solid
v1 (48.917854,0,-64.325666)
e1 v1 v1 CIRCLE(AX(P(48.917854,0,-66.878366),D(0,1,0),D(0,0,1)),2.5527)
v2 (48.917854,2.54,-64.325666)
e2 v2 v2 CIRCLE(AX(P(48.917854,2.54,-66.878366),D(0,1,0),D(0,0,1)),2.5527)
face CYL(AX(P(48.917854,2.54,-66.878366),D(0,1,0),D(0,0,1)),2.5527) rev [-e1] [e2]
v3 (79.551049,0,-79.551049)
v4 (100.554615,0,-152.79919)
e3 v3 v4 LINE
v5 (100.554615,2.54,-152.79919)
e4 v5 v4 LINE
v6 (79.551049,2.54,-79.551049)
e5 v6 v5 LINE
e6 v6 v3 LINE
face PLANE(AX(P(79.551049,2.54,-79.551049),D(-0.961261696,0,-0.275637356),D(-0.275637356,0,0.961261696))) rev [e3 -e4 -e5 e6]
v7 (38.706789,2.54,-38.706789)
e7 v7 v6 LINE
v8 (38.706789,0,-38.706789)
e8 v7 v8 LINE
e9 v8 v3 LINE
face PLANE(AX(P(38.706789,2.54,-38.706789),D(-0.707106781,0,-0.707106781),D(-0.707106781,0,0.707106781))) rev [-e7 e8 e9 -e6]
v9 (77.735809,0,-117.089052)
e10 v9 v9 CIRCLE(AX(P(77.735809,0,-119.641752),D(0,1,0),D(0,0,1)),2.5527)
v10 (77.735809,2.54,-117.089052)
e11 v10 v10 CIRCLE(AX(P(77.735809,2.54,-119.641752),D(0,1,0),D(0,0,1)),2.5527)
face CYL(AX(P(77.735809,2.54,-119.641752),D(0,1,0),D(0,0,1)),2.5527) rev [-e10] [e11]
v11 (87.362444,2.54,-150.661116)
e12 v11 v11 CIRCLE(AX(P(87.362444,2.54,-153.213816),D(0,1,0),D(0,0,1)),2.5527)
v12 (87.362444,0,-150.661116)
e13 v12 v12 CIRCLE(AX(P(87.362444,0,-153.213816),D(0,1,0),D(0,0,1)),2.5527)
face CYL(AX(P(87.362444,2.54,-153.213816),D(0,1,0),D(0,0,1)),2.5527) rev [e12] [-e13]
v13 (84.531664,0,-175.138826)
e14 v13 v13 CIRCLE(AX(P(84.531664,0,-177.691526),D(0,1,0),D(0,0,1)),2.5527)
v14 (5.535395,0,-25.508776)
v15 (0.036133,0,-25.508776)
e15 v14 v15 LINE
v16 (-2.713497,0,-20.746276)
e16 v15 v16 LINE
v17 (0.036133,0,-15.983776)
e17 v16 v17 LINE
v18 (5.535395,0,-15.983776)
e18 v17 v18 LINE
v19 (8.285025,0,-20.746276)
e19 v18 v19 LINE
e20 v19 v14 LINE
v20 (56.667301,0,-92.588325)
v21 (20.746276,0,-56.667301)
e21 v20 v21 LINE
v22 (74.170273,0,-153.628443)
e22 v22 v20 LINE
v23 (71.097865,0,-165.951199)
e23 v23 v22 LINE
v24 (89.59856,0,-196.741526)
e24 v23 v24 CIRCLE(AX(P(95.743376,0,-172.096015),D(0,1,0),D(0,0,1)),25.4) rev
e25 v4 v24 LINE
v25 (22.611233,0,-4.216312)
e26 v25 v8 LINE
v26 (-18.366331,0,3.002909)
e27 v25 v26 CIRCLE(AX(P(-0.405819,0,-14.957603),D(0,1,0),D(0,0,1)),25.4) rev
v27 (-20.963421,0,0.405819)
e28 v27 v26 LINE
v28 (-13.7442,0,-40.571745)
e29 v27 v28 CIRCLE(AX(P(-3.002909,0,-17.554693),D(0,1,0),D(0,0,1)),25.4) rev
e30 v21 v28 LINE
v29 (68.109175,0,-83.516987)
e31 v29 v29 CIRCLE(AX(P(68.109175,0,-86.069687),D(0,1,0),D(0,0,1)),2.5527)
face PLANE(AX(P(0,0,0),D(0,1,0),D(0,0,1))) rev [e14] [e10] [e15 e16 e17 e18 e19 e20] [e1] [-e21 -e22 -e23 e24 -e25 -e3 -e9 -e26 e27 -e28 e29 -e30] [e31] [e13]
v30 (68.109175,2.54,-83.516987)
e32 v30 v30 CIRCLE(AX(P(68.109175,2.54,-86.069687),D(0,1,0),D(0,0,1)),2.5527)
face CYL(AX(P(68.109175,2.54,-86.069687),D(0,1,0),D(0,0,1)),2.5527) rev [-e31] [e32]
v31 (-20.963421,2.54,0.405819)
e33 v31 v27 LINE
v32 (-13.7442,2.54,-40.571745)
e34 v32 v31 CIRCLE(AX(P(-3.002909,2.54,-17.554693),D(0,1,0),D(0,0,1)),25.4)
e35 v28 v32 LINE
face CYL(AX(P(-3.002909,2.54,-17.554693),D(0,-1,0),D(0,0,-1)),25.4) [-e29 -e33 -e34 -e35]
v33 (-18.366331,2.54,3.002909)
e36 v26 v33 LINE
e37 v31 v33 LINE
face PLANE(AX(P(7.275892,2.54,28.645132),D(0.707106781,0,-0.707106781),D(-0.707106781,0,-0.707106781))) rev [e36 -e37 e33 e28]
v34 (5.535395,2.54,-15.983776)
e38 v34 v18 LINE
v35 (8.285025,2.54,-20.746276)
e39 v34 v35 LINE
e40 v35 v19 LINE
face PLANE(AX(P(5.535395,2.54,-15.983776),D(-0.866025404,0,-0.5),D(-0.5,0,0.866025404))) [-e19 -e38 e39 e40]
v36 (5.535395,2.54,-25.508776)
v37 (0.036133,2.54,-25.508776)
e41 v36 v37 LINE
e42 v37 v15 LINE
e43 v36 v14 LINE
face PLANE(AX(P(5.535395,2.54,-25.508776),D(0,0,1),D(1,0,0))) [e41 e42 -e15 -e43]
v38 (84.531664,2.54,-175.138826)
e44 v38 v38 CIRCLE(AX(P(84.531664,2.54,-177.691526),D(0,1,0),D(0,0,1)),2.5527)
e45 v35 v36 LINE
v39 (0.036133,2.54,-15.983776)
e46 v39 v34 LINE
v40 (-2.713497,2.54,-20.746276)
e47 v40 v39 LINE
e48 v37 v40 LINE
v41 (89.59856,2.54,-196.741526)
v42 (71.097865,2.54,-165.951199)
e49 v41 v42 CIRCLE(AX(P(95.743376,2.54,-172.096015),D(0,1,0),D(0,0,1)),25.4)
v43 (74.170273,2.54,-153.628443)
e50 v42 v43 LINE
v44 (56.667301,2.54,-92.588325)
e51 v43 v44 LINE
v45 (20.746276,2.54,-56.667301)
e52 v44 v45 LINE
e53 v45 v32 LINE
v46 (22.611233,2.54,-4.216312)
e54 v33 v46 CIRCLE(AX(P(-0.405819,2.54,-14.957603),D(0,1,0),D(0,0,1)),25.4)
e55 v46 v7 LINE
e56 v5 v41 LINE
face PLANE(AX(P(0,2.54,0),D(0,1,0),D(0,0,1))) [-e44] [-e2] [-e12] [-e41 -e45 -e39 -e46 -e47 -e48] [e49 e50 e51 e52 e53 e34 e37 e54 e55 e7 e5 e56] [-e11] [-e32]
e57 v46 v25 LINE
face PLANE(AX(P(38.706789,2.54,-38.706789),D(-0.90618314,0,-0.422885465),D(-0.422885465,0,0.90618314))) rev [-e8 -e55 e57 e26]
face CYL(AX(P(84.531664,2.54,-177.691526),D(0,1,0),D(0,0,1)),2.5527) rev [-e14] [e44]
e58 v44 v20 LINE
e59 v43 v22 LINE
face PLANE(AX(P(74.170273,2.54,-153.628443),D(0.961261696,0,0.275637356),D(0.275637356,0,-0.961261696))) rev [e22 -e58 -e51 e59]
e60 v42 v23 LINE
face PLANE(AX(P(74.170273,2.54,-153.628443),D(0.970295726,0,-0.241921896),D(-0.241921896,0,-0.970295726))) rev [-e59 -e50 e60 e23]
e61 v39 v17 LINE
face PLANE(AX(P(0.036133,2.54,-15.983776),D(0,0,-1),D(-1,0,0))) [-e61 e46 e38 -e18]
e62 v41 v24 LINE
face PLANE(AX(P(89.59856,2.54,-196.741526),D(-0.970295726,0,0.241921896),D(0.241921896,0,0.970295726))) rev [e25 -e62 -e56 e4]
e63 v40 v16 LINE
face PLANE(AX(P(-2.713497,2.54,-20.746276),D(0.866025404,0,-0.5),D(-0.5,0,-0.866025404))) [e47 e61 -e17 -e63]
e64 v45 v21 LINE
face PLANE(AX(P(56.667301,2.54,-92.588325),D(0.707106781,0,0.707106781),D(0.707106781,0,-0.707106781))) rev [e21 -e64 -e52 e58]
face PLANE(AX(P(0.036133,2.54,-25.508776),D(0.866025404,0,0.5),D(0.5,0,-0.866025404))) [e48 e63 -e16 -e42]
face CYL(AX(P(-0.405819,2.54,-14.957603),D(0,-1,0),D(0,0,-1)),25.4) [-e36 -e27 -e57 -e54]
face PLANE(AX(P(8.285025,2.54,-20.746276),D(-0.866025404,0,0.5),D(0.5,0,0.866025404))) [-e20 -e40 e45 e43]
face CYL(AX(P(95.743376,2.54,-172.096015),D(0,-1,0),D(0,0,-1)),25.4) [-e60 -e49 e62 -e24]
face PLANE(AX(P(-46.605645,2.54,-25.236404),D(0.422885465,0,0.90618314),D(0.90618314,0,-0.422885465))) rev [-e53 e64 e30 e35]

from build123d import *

# Parameters (mm, degrees)
BOSS_EXTRUDE1_DEPTH        = 2.54
FILLET3_R                  = 25.4
F_10_CLEARANCE_HOLE1_D     = 5.1054
F_10_CLEARANCE_HOLE1_DEPTH = 9.906
F_10_CLEARANCE_HOLE1_TIP   = 1.533816902
FILLET4_R                  = 25.4


with BuildPart() as part:
    # Sketch1 → Boss-Extrude1 (new body)
    with BuildSketch(Plane(origin=(0, 0, 0), x_dir=(1, 0, 0), z_dir=(0, 1, 0))):
        Polygon((38.706788555, 38.706788555), (79.551048595, 79.551048595), (100.554615109, 152.799189826), (89.598560117, 196.741526293), (64.953048669, 190.596710145), (74.170272892, 153.628442974), (56.667300797, 92.588325282), (20.746276313, 56.667300797), (-46.605644595, 25.236404374), (7.275892132, -28.645132353), align=None)
        Polygon((8.285025385, 20.746276313), (5.535394728, 25.508776313), (0.036133414, 25.508776313), (-2.713497243, 20.746276313), (0.036133414, 15.983776313), (5.535394728, 15.983776313), align=None, mode=Mode.SUBTRACT)
    extrude(amount=BOSS_EXTRUDE1_DEPTH)

    # Fillet3
    fillet3_edges = [part.edges().sort_by_distance(p)[0] for p in [
        (64.953048669, 1.27, -190.596710145),
    ]]
    fillet(fillet3_edges, radius=FILLET3_R - 0.0001)  # a hair under: the kernel refuses the full size

    # #10 Clearance Hole1
    with Locations(Plane(origin=(0, 2.54, 0), x_dir=(1, 0, 0), z_dir=(0, 1, 0))):
        with Locations((84.531663752, 177.691526293), (87.362444, 153.2138164), (77.735809348, 119.641751669), (68.109174696, 86.069686939), (48.917853565, 66.878365807)):
            Hole(F_10_CLEARANCE_HOLE1_D / 2, depth=F_10_CLEARANCE_HOLE1_DEPTH)
            with Locations((0, 0, -(F_10_CLEARANCE_HOLE1_DEPTH + F_10_CLEARANCE_HOLE1_TIP / 2))):  # 118° drill point
                Cone(0, F_10_CLEARANCE_HOLE1_D / 2, F_10_CLEARANCE_HOLE1_TIP, mode=Mode.SUBTRACT)

    # Fillet4
    fillet4_edges = [part.edges().sort_by_distance(p)[0] for p in [
        (7.275892132, 1.27, 28.645132353),
        (-46.605644595, 1.27, -25.236404374),
    ]]
    fillet(fillet4_edges, radius=FILLET4_R)


solid = part.part
